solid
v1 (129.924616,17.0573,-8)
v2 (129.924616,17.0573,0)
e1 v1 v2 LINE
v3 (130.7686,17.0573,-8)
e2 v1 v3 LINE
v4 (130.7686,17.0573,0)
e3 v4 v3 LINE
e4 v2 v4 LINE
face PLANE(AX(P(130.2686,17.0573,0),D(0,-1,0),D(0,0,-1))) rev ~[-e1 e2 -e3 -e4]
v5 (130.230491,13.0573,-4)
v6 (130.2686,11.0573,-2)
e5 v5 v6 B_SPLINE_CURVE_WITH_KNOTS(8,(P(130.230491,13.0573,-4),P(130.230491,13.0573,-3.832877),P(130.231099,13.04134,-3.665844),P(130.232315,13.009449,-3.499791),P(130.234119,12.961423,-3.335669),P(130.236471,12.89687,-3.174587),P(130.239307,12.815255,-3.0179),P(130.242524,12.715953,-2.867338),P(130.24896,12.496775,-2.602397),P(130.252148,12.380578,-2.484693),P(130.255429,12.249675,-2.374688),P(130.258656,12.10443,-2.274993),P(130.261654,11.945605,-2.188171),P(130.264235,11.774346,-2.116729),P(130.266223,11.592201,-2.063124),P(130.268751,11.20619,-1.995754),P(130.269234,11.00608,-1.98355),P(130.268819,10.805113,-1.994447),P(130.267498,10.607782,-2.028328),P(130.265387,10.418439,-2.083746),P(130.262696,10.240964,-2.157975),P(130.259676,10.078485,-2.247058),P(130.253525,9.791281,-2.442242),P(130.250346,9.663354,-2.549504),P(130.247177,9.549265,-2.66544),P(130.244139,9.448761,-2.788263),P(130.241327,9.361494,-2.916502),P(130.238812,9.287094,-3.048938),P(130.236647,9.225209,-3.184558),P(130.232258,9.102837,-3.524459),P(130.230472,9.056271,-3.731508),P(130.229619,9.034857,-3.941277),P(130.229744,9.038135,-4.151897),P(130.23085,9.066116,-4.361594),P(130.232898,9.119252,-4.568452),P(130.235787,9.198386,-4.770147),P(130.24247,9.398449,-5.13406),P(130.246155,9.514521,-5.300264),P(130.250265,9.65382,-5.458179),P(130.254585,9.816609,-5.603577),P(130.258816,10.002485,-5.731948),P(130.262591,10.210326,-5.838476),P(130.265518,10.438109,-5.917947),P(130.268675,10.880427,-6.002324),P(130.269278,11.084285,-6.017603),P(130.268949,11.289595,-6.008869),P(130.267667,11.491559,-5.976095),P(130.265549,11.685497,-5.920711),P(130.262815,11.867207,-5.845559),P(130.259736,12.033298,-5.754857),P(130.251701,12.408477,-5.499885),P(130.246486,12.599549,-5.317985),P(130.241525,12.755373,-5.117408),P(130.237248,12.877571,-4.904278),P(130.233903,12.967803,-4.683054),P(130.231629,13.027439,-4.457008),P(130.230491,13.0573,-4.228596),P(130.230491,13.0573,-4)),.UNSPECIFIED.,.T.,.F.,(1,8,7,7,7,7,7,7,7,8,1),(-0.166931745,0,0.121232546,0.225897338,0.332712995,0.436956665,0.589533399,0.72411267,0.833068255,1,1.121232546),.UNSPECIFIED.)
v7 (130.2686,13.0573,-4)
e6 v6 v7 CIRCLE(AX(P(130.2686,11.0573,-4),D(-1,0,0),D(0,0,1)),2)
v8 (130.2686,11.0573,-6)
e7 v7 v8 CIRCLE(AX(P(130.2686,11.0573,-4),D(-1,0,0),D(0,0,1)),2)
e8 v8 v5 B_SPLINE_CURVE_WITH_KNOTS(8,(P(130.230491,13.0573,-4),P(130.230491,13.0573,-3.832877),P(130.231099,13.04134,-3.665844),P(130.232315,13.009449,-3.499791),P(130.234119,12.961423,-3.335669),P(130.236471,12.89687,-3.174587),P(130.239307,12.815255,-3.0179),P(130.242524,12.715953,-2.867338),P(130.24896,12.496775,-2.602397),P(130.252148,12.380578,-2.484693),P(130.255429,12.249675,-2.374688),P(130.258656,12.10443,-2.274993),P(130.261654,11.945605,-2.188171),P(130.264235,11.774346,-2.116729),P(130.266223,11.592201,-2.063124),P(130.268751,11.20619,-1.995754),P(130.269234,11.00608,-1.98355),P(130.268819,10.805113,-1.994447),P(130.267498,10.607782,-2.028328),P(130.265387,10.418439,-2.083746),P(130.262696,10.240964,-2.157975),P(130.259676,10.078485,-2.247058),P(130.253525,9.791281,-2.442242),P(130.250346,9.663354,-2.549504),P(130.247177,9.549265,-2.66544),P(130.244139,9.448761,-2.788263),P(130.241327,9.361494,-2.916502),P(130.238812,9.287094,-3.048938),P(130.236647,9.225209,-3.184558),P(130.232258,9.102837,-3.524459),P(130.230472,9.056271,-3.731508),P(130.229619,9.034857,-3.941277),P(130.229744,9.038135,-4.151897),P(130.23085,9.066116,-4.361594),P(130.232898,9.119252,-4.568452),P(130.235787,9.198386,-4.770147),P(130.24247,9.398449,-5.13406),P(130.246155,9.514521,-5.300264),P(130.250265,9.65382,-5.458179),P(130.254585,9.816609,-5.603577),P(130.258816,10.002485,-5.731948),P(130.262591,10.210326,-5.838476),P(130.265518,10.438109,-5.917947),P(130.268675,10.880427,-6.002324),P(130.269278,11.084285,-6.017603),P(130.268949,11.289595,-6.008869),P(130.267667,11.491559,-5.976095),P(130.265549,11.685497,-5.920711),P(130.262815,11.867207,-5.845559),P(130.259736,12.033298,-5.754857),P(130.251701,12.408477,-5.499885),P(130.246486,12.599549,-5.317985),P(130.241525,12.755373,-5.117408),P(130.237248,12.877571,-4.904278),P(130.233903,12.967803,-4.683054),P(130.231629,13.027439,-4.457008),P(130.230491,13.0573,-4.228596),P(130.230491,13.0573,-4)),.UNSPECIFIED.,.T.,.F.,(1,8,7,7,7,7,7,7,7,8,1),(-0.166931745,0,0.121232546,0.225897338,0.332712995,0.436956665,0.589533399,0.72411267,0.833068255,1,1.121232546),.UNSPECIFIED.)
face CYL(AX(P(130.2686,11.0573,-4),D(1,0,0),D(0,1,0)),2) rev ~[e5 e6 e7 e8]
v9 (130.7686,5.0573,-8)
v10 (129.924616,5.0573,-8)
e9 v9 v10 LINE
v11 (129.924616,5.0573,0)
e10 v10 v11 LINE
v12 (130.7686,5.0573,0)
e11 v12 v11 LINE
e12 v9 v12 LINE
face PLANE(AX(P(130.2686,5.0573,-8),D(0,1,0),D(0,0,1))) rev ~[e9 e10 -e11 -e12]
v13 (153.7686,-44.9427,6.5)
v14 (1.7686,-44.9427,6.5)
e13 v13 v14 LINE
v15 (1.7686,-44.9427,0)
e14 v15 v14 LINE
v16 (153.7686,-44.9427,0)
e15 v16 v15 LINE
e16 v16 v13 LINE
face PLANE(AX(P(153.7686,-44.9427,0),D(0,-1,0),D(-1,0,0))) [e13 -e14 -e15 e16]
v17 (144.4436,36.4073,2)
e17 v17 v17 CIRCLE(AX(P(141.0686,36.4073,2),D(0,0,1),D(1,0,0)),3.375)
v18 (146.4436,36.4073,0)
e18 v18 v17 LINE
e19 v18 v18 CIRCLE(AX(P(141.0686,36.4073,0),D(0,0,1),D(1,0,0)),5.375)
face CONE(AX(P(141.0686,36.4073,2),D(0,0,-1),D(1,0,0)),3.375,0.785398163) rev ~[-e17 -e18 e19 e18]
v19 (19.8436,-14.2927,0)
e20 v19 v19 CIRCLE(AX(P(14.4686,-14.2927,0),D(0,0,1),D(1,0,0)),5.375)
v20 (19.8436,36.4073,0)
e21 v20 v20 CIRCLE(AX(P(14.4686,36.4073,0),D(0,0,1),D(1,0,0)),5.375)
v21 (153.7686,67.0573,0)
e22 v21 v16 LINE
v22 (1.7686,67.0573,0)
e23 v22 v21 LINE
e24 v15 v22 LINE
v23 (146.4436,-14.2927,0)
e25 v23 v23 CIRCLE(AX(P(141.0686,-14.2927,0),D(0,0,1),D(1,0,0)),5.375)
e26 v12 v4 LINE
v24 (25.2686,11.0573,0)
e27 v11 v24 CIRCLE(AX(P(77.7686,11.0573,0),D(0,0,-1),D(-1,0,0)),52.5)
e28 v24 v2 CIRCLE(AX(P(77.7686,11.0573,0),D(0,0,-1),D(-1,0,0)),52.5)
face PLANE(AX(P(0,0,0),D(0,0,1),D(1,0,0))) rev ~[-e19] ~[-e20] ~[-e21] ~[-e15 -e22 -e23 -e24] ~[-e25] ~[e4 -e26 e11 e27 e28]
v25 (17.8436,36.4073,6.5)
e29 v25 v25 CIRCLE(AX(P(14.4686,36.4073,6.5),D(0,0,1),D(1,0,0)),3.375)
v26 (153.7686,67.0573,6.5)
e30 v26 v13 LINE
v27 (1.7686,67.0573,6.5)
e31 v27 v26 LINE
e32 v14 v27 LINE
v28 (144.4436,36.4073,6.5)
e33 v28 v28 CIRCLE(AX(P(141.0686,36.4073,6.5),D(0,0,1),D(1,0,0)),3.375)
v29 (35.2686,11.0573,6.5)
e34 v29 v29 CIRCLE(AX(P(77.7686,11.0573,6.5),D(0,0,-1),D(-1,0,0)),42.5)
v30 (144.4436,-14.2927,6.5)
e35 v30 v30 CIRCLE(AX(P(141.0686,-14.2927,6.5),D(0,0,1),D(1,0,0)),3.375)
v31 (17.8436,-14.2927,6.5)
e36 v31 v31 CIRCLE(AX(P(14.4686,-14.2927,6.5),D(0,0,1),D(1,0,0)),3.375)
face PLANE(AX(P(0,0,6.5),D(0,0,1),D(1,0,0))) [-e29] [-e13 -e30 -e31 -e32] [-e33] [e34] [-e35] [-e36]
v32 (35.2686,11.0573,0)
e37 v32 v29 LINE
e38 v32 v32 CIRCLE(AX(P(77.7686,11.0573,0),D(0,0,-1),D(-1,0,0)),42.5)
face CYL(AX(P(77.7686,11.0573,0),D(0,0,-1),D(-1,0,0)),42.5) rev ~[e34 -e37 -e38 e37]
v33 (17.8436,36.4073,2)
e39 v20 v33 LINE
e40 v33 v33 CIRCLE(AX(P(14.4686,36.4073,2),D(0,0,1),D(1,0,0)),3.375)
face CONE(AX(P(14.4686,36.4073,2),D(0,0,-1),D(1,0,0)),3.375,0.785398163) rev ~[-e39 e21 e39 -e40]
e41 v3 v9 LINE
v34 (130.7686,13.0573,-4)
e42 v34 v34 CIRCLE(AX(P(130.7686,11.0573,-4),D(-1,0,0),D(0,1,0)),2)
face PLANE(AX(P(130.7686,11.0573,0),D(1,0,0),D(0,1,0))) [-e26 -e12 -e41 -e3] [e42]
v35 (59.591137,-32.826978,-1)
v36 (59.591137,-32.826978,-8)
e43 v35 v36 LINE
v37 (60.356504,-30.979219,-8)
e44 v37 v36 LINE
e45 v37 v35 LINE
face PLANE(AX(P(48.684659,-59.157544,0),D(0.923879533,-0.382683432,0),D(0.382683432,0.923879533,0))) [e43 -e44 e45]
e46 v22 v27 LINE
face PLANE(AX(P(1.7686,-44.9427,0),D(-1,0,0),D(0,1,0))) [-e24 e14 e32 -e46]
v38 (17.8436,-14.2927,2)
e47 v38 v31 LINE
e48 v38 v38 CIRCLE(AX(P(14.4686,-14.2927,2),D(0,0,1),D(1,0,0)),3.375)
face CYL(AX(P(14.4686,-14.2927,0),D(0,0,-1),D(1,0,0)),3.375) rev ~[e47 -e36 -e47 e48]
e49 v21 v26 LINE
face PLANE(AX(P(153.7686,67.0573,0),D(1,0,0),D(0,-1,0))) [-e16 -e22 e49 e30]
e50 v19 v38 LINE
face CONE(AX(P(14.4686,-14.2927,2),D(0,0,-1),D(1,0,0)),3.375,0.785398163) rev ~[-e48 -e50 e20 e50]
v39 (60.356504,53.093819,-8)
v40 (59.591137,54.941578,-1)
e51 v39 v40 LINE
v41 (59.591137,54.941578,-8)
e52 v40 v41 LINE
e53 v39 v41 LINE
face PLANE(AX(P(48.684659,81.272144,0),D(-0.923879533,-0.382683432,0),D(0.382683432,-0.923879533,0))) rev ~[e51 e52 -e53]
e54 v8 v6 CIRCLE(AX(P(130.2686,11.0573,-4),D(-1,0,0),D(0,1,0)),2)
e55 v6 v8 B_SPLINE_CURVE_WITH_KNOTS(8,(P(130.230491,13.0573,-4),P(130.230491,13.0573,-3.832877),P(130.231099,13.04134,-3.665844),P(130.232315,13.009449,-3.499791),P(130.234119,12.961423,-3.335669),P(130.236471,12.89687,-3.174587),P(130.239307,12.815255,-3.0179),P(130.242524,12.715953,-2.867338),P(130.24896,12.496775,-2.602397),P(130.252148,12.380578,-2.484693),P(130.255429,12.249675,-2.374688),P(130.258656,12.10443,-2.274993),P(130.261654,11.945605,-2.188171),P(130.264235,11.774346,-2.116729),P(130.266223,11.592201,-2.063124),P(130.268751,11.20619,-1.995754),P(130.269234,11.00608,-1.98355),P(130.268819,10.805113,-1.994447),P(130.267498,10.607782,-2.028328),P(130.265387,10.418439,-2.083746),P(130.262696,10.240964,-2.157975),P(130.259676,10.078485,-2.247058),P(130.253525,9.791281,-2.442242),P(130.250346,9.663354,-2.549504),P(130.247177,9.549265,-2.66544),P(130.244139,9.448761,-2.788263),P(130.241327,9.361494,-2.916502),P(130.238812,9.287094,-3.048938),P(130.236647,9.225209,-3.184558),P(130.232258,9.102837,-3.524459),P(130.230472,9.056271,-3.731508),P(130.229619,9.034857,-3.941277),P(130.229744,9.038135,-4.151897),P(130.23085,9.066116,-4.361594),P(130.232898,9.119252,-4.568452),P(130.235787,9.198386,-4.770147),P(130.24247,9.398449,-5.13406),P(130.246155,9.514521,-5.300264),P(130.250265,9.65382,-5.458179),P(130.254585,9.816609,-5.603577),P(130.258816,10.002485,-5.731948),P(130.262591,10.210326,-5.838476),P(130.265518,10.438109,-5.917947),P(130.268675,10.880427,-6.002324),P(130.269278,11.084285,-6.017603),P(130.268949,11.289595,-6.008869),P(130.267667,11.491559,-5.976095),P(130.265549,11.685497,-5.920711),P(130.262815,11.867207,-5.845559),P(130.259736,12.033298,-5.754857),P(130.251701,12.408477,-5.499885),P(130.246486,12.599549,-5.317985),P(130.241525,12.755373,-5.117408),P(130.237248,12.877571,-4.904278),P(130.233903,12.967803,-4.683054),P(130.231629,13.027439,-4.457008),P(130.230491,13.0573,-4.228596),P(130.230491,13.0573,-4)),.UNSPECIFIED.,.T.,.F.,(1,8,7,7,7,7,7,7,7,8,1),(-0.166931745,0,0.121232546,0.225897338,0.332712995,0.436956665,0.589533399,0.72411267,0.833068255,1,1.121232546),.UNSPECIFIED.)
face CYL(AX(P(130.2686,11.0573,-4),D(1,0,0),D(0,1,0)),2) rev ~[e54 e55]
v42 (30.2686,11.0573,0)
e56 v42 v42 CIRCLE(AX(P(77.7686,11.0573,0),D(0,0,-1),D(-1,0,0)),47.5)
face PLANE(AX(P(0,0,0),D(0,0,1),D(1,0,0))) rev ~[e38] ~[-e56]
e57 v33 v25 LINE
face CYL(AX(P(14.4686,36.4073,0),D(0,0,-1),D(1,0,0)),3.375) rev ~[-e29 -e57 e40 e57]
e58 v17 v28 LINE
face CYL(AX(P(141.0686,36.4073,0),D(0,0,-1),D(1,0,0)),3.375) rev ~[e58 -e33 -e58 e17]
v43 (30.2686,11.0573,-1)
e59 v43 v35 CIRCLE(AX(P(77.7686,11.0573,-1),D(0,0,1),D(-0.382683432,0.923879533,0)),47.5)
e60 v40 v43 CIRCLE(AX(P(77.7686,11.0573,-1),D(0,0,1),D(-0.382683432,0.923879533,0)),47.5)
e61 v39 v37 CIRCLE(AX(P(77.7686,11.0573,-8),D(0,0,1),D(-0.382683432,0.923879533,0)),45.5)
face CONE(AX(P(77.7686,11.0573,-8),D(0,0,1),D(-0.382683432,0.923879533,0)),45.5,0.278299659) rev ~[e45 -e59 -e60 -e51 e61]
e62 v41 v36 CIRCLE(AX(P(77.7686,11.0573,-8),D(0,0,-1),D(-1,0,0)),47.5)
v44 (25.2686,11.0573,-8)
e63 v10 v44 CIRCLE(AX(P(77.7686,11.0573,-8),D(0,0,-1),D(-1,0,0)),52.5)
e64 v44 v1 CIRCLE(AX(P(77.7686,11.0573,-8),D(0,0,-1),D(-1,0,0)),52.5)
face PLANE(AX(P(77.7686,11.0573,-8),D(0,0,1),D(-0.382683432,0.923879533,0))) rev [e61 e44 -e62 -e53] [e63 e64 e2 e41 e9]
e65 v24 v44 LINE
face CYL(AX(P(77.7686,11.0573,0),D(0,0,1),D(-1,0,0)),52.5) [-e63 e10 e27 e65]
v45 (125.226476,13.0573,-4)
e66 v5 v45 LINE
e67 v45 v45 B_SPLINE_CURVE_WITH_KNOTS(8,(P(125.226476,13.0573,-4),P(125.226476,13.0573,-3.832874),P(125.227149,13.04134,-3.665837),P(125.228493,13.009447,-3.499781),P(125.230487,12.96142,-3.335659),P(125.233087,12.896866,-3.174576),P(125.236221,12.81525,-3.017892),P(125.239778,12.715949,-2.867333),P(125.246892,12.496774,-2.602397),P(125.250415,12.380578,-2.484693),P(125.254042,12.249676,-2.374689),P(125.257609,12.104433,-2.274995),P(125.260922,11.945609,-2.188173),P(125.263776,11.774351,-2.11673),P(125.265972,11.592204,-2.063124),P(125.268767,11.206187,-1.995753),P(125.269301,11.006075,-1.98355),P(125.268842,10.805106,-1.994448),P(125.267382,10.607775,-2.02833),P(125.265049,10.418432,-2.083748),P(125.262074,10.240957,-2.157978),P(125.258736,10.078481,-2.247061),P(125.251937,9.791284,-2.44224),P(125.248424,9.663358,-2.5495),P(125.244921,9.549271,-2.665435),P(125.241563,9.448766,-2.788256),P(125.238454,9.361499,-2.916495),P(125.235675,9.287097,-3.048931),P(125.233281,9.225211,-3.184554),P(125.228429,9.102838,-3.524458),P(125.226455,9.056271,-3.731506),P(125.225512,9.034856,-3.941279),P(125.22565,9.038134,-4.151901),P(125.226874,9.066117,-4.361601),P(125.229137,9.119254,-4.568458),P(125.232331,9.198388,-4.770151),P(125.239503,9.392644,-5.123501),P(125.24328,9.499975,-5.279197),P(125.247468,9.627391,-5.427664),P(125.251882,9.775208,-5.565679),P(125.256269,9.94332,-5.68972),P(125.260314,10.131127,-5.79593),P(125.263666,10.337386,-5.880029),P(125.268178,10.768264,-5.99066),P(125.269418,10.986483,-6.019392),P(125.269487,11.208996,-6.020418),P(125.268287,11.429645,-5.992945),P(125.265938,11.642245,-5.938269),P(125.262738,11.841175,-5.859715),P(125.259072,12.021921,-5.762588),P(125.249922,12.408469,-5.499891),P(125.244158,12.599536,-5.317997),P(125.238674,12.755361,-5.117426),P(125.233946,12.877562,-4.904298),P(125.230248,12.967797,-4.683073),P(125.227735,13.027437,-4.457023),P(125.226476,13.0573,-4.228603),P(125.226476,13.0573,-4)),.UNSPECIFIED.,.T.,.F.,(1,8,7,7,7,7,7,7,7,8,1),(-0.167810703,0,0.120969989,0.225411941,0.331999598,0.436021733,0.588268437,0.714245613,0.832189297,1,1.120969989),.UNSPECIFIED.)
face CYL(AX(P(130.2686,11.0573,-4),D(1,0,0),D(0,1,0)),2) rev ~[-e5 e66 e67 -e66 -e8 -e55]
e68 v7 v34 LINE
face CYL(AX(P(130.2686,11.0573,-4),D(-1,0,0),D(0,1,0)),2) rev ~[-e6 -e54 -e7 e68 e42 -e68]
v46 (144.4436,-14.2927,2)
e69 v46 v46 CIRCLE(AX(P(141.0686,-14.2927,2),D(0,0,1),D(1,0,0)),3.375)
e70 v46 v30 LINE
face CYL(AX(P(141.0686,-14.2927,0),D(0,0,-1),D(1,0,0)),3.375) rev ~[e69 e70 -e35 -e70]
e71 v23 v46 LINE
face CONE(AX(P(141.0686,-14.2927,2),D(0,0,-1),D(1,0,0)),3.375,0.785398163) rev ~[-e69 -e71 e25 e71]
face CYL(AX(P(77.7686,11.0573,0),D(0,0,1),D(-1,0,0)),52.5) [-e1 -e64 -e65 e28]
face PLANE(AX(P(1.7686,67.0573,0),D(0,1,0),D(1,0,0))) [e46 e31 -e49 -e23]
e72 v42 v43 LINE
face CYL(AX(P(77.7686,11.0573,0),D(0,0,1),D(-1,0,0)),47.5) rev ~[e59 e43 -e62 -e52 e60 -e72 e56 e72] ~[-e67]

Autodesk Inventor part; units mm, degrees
ref_plane "YZ Plane" through (0, 0, 0) normal (1, 0, 0) x (0, 1, 0)
ref_plane "XZ Plane" through (0, 0, 0) normal (0, 1, 0) x (-1, 0, 0)
ref_plane "XY Plane" through (0, 0, 0) normal (0, 0, 1) x (1, 0, 0)
sketch "Sketch1" plane through (0, 0, 0) normal (0, 0, 1) x (1, 0, 0)
  line L0 (14.4686, 36.4073) -> (141.0686, 36.4073) construction
  line L1 (141.0686, 36.4073) -> (141.0686, -14.2927) construction
  line L2 (141.0686, -14.2927) -> (14.4686, -14.2927) construction
  line L3 (14.4686, -14.2927) -> (14.4686, 36.4073) construction
  circle A0 centre (14.4686, 36.4073) radius 3.375
  circle A1 centre (14.4686, -14.2927) radius 3.375
  circle A2 centre (141.0686, -14.2927) radius 3.375
  circle A3 centre (141.0686, 36.4073) radius 3.375
  line L4 (1.7686, 67.0573) -> (153.7686, 67.0573)
  line L5 (153.7686, 67.0573) -> (153.7686, -44.9427)
  line L6 (153.7686, -44.9427) -> (1.7686, -44.9427)
  line L7 (1.7686, -44.9427) -> (1.7686, 67.0573)
  line L8 (14.4686, 36.4073) -> (1.7686, 67.0573) construction
  line L9 (14.4686, -14.2927) -> (1.7686, -44.9427) construction
  line L10 (141.0686, -14.2927) -> (153.7686, -44.9427) construction
  line L11 (141.0686, 36.4073) -> (153.7686, 67.0573) construction
  line L12 (153.7686, 11.0573) -> (1.7686, 11.0573) construction
  point P0 (0, 0)
  dimension "d1" = 126.6
  dimension "d2" = 50.7
  dimension "d3" = 6.75
  dimension "d4" = 152
  dimension "d5" = 112
extrude "Extrusion1" add sketch "Sketch1" along normal blind 6.5
sketch "Sketch4" plane through (0, 0, 0) normal (0, 0, -1) x (-1, 0, 0)
  circle A0 centre (-77.7686, 11.0573) radius 47.5
  line L0 (-153.7686, 67.0573) -> (-1.7686, 67.0573) construction
  line L1 (-1.7686, -44.9427) -> (-153.7686, -44.9427) construction
  line L2 (-1.7686, 67.0573) -> (-153.7686, -44.9427) construction
  line L3 (-1.7686, -44.9427) -> (-153.7686, 67.0573) construction
  circle A1 centre (-77.7686, 11.0573) radius 52.5
  circle A2 centre (-77.7686, 11.0573) radius 42.5
  point P0 (0, 0)
  dimension "d12" = 95
  dimension "d13" = 5
  dimension "d34" = 5
extrude "Extrusion2" add sketch "Sketch4" along normal blind 8 contours A1
ref_plane "Work Plane3" through (1.7686, 11.0573, 0) normal (0, -1, 0) x (1, 0, 0)
sketch "Sketch6" plane through (1.7686, 11.0573, 0) normal (0, -1, 0) x (1, 0, 0)
  line L0 (28.5, 0) -> (28.5, -8) projected
  line L1 (123.5, -8) -> (28.5, -8) projected
  line L2 (28.5, -8) -> (30.5, -8)
  line L3 (30.5, -8) -> (28.5, -1)
  line L4 (28.5, -8) -> (28.5, -1)
  line L5 (76, -10.9) -> (76, 9.4) projected
  dimension "d16" = 2
  dimension "d17" = 7
revolve "Revolution1" add sketch "Sketch6" angle 135 mid plane about axis through (77.7686, 11.0573, -8) along (0, 0, 1)
ref_plane "Work Plane4" through (130.2686, 11.0573, 0) normal (1, 0, 0) x (0, 1, 0)
sketch "Sketch7" plane through (130.2686, 11.0573, 0) normal (1, 0, 0) x (0, 1, 0)
  line L0 (-52.5, -8) -> (52.5, -8) projected
  line L1 (56, 0) -> (-56, 0) projected
  line L2 (56, 0) -> (56, 6.5) projected
  line L3 (-56, 6.5) -> (56, 6.5) projected
  line L4 (-56, 0) -> (-56, 6.5) projected
  line L5 (47.5, -8) -> (-47.5, -8) projected
  line L6 (-47.5, 0) -> (47.5, 0) projected
  line L7 (6, -8) -> (-6, -8)
  line L8 (-6, -8) -> (-6, 0)
  line L9 (-6, 0) -> (6, 0)
  line L10 (6, 0) -> (6, -8)
  line L11 (0, -10.9) -> (0, 9.4) projected
  circle A0 centre (0, -4) radius 2
  point P0 (-11.0573, 0)
  point P1 (-43.8843, -8)
  point P2 (43.8843, -8)
  point P3 (0, -8)
  dimension "d23" = 12
  dimension "d24" = 4
extrude "Extrusion3" add sketch "Sketch7" against normal up to next contours L8 L1 L11 A0 L0 | L11 A0 L1 L10 L0
extrude "Extrusion4" add sketch "Sketch7" along normal blind 0.5 contours L8 L1 L11 A0 L0 | L11 A0 L1 L10 L0
extrude "Extrusion5" cut sketch "Sketch7" against normal up to next contours A0 L11 | L11 A0
chamfer "Chamfer1" distance 2 angle 45 4 edges at (11.0936, -14.2927, 0) (11.0936, 36.4073, 0) (137.6936, 36.4073, 0) (137.6936, -14.2927, 0)
extrude "Extrusion6" cut sketch "Sketch4" against normal through all contours A2
properties part number "AZ100 ASI LX-4000 stage adapter"
